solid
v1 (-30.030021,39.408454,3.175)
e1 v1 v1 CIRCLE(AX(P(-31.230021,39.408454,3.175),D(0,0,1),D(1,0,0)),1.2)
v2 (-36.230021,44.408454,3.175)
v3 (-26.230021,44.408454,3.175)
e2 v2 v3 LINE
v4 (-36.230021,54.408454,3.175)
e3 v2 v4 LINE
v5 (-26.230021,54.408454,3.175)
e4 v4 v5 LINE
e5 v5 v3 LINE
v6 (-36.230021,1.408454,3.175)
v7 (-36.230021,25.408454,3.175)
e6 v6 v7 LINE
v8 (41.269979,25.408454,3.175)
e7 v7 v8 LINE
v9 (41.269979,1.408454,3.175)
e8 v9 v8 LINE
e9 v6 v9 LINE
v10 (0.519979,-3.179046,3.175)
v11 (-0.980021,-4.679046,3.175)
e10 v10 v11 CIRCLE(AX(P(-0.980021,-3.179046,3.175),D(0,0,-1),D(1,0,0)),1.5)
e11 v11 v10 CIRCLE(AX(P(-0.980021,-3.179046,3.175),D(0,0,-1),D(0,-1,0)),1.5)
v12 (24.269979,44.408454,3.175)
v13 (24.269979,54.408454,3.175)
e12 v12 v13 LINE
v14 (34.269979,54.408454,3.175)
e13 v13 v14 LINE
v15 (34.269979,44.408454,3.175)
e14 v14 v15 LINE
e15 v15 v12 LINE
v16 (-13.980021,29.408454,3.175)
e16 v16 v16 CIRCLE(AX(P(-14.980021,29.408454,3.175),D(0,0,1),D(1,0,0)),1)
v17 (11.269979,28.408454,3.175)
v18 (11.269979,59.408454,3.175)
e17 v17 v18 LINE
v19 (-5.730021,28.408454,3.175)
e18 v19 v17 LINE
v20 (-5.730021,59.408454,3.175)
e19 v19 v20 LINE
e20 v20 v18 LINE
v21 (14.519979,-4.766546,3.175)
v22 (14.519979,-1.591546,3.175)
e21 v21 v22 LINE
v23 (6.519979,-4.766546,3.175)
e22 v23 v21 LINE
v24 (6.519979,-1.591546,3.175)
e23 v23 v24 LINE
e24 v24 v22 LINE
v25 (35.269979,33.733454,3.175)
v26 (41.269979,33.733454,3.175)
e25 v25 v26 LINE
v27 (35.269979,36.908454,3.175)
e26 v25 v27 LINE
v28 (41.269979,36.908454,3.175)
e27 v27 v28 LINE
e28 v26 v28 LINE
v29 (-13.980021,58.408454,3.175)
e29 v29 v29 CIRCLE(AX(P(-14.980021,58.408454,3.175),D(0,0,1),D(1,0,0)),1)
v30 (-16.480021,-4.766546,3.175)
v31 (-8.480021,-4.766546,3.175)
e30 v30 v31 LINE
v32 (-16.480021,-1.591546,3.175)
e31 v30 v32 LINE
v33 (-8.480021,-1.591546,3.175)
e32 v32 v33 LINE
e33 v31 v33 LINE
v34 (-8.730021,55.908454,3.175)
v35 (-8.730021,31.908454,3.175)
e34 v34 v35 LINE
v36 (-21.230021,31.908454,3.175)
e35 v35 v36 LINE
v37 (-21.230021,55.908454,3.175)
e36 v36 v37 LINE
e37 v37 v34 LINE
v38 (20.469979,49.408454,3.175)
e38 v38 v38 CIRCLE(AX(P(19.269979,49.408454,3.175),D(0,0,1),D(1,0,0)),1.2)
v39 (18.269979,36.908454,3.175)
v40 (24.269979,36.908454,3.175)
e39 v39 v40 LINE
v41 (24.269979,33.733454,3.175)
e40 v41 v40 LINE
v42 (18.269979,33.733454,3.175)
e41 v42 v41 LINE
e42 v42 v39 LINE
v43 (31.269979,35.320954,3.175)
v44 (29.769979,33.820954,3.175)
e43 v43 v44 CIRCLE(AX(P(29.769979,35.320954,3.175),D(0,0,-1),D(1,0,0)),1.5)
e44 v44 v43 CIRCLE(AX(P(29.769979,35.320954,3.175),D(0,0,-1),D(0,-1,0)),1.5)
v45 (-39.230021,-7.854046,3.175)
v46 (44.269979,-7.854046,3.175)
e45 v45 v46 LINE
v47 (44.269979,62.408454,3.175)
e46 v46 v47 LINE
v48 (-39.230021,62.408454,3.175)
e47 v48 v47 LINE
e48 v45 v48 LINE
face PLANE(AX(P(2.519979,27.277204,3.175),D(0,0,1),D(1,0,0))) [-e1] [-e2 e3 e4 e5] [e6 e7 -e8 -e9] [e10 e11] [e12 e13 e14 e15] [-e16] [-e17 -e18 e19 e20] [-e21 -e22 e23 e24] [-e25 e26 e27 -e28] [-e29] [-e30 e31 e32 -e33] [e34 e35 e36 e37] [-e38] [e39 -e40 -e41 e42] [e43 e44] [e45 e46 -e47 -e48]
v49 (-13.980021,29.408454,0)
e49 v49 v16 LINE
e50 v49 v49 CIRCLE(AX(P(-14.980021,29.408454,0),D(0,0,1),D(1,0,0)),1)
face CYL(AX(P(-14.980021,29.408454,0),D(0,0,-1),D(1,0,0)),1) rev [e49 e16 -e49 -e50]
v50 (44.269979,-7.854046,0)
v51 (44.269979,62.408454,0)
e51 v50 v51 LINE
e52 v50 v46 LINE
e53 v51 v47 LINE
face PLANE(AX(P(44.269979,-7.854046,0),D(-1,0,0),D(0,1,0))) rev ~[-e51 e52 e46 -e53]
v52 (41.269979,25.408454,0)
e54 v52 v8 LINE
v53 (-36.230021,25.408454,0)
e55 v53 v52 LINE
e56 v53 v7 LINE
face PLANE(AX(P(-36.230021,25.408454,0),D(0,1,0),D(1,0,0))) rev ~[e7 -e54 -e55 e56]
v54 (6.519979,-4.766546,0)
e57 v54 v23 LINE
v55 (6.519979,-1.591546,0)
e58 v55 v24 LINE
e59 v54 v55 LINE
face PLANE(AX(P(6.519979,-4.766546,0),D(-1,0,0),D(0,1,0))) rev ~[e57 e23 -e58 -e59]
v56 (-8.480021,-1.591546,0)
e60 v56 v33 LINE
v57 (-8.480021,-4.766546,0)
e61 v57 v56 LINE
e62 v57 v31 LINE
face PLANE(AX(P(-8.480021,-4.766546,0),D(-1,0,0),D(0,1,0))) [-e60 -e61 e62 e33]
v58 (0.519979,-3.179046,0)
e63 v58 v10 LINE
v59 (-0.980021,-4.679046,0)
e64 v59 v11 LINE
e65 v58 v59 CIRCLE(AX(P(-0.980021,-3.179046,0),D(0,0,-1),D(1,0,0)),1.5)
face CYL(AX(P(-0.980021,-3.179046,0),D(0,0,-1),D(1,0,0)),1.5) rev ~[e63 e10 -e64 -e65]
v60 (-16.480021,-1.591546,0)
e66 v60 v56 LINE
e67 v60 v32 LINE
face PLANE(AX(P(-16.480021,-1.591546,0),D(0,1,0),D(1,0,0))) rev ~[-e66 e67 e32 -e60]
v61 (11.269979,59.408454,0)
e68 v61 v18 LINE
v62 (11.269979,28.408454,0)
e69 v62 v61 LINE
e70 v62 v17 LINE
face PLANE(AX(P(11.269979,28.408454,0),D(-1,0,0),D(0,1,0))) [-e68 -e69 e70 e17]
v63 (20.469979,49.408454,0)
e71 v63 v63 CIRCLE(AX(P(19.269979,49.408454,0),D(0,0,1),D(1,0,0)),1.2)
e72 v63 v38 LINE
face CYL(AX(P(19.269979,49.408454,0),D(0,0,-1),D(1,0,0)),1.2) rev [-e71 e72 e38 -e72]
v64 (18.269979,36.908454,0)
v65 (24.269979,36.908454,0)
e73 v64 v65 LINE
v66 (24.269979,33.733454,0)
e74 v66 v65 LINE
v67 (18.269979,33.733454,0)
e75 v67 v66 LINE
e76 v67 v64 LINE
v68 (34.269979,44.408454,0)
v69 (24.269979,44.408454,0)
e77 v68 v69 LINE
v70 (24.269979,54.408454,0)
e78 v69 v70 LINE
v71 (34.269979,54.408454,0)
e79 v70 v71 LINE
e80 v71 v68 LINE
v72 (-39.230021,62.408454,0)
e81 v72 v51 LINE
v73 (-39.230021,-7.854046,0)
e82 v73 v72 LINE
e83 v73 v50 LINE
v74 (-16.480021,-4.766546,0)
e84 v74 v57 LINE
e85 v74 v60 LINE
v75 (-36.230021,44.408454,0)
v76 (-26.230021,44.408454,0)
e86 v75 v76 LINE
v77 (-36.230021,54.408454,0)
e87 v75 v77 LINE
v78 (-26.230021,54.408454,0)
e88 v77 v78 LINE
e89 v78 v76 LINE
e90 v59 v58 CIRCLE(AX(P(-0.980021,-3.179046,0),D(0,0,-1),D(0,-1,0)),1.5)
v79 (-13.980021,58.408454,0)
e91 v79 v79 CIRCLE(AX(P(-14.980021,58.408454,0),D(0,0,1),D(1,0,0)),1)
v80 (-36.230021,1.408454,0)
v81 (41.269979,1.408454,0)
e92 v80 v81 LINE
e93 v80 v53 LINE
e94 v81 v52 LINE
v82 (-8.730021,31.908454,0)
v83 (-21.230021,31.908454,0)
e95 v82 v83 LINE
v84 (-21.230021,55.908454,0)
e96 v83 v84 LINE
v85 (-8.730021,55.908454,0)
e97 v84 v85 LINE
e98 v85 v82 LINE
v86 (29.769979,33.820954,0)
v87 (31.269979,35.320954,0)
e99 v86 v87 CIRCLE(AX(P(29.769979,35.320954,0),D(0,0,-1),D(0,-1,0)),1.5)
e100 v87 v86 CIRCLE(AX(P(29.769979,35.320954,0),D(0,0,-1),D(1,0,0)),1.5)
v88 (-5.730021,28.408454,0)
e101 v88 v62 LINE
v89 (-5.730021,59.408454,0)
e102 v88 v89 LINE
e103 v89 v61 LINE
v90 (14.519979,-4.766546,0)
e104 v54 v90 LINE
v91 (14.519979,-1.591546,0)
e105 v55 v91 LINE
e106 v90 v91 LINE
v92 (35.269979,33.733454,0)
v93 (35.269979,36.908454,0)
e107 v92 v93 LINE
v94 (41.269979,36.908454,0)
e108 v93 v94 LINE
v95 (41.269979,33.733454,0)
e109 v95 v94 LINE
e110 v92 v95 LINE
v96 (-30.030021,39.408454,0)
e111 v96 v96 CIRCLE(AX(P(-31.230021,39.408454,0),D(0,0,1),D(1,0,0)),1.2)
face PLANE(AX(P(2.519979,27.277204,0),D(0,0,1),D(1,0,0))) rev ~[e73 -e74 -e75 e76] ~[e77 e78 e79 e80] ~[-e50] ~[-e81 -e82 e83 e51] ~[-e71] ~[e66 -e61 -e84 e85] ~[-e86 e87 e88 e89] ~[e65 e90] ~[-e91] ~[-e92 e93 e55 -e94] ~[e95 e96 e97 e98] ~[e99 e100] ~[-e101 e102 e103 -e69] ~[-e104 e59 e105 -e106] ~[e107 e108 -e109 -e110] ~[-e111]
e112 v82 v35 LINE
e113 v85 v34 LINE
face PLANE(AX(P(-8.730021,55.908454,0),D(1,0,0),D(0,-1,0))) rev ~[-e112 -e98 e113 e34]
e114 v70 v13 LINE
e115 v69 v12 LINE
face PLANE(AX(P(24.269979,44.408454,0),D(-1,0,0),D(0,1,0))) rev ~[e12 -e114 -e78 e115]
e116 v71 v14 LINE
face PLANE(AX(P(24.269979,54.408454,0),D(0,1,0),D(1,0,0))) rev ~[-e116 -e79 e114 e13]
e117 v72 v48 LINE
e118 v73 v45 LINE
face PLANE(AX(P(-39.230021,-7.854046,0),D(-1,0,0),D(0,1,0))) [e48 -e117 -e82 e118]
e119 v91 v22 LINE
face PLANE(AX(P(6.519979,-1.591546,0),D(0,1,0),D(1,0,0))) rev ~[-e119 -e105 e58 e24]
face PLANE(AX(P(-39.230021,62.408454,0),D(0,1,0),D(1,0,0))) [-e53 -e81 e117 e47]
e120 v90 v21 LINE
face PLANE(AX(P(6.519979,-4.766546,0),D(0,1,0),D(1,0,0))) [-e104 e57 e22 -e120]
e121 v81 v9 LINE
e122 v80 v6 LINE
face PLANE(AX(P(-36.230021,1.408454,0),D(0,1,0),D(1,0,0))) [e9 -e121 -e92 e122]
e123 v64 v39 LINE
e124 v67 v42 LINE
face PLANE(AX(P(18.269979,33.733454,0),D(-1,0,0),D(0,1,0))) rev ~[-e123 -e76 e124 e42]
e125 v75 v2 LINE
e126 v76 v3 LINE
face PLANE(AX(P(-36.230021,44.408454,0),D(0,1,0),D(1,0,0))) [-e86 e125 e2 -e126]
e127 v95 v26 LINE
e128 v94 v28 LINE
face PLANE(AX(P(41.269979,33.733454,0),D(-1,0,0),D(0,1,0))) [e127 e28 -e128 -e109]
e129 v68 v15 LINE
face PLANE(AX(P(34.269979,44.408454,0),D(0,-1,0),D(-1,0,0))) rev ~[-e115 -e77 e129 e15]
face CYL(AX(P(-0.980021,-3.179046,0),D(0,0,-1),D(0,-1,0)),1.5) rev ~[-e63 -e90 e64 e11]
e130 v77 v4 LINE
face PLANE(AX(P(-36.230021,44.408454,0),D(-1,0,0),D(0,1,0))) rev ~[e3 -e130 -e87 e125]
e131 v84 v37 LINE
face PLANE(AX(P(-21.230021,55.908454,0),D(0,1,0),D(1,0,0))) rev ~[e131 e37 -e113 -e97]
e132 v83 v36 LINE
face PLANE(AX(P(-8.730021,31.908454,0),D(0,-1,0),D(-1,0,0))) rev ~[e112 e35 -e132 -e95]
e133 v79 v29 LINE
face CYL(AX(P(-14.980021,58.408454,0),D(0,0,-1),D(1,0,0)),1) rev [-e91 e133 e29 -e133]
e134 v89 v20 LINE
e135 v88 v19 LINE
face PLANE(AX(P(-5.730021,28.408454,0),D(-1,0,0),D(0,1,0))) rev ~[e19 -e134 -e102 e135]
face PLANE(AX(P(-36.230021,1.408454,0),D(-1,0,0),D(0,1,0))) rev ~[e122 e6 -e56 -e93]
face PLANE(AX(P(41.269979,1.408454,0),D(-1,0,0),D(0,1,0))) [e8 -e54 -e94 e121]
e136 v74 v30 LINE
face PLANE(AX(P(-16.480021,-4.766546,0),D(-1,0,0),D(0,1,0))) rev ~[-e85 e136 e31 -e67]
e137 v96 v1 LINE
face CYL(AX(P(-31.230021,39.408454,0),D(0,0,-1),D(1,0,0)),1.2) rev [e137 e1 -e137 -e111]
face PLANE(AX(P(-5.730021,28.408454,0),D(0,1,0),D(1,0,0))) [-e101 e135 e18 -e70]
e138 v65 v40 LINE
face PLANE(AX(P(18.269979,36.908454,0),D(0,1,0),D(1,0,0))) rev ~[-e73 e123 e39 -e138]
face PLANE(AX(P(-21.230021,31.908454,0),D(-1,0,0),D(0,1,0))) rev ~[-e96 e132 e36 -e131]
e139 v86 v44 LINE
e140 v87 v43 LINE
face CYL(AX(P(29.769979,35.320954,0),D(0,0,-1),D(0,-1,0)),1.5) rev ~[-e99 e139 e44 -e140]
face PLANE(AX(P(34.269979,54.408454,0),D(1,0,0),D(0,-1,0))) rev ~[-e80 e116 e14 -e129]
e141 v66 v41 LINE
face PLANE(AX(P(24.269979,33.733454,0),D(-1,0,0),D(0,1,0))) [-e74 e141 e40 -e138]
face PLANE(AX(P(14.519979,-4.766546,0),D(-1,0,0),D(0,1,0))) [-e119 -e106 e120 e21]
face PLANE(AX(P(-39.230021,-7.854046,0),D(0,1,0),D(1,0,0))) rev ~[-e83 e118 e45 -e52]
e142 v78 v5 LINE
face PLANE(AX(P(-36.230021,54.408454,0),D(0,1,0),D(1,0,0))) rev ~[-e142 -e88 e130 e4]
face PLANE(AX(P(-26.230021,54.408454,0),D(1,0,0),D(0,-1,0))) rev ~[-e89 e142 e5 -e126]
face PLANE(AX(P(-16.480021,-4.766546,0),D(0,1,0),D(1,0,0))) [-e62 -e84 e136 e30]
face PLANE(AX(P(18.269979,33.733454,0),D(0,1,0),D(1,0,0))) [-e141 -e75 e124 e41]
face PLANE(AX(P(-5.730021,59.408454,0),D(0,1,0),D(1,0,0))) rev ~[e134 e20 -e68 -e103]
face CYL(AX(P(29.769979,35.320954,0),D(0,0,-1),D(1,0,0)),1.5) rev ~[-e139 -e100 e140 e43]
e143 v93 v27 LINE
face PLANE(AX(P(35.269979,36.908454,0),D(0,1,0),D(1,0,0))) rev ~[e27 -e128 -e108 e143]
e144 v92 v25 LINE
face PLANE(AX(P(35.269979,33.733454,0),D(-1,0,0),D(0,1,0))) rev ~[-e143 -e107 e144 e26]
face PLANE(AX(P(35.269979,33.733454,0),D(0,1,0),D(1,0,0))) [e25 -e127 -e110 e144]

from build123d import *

# Parameters (mm, degrees)
F0_W     = 83.5
F0_H     = 70.2625
F0_W_2   = 8
F0_H_2   = 3.175
F0_W_3   = 77.5
F0_H_3   = 24
F0_R     = 1
F0_W_4   = 6
F0_W_5   = 17
F0_H_4   = 31
F0_W_6   = 10
F0_H_5   = 10
F0_R_2   = 1.2
F1_DEPTH = 3.175


# Not quite as in the source:
# - a length typed as a fraction of an inch, garbled in the dataset ("3 / 203.2 mm" for 3/8 in), is restored
# - a feature names something its author has since deleted; it is built from what else it names


with BuildPart() as f1:
    # F0 (on Top) → F1 (new body)
    with BuildSketch(Plane.XY):
        with Locations((2.5199788651, 27.2772044539)):
            Rectangle(F0_W, F0_H)
        with Locations((-12.4800211349, -3.1790455461)):
            Rectangle(F0_W_2, F0_H_2, mode=Mode.SUBTRACT)
        with BuildLine():
            ThreePointArc((-0.9800211349, -4.6790455461), (-2.0406813067, -2.1183853743), (0.5199788651, -3.1790455461))
            ThreePointArc((0.5199788651, -3.1790455461), (0.0806390368, -4.2397057179), (-0.9800211349, -4.6790455461))
        make_face(mode=Mode.SUBTRACT)
        with Locations((10.5199788651, -3.1790455461)):
            Rectangle(F0_W_2, F0_H_2, mode=Mode.SUBTRACT)
        with Locations((2.5199788651, 13.4084544539)):
            Rectangle(F0_W_3, F0_H_3, mode=Mode.SUBTRACT)
        Polygon((-36.2300211349, 34.4084544539), (-36.230021135, 44.4084544539), (-36.230021135, 54.4084544539), (-26.230021135, 54.4084544539), (-26.230021135, 44.4084544539), (-26.2300211349, 34.4084544539), align=None, mode=Mode.SUBTRACT)
        with Locations((-14.980021135, 29.4084544539)):
            Circle(F0_R, mode=Mode.SUBTRACT)
        Polygon((-21.230021135, 31.9084544539), (-21.230021135, 55.9084544539), (-8.730021135, 55.9084544539), (-8.730021135, 43.9084544539), (-8.730021135, 31.9084544539), align=None, mode=Mode.SUBTRACT)
        with Locations((-14.980021135, 58.4084544539)):
            Circle(F0_R, mode=Mode.SUBTRACT)
        with Locations((21.2699788651, 35.3209544539)):
            Rectangle(F0_W_4, F0_H_2, mode=Mode.SUBTRACT)
        with Locations((2.7699788651, 43.9084544539)):
            Rectangle(F0_W_5, F0_H_4, mode=Mode.SUBTRACT)
        with BuildLine():
            ThreePointArc((29.7699788651, 33.8209544539), (28.7093186933, 36.3816146257), (31.2699788651, 35.3209544539))
            ThreePointArc((31.2699788651, 35.3209544539), (30.8306390368, 34.2602942821), (29.7699788651, 33.8209544539))
        make_face(mode=Mode.SUBTRACT)
        with Locations((38.2699788651, 35.3209544539)):
            Rectangle(F0_W_4, F0_H_2, mode=Mode.SUBTRACT)
        Polygon((14.2699788651, 54.4084544539), (24.2699788651, 54.4084544539), (34.2699788651, 54.4084544539), (34.2699788651, 44.4084544539), (24.2699788651, 44.4084544539), (14.2699788651, 44.4084544539), align=None, mode=Mode.SUBTRACT)
        with Locations((-31.2300211349, 39.4084544539)):
            Rectangle(F0_W_6, F0_H_5)
        with Locations((-31.230021135, 39.4084544539)):
            Circle(F0_R_2, mode=Mode.SUBTRACT)
        with Locations((19.2699788651, 49.4084544539)):
            Rectangle(F0_W_6, F0_H_5)
        with Locations((19.2699788651, 49.4084544539)):
            Circle(F0_R_2, mode=Mode.SUBTRACT)
    extrude(amount=F1_DEPTH)


solid = f1.part
